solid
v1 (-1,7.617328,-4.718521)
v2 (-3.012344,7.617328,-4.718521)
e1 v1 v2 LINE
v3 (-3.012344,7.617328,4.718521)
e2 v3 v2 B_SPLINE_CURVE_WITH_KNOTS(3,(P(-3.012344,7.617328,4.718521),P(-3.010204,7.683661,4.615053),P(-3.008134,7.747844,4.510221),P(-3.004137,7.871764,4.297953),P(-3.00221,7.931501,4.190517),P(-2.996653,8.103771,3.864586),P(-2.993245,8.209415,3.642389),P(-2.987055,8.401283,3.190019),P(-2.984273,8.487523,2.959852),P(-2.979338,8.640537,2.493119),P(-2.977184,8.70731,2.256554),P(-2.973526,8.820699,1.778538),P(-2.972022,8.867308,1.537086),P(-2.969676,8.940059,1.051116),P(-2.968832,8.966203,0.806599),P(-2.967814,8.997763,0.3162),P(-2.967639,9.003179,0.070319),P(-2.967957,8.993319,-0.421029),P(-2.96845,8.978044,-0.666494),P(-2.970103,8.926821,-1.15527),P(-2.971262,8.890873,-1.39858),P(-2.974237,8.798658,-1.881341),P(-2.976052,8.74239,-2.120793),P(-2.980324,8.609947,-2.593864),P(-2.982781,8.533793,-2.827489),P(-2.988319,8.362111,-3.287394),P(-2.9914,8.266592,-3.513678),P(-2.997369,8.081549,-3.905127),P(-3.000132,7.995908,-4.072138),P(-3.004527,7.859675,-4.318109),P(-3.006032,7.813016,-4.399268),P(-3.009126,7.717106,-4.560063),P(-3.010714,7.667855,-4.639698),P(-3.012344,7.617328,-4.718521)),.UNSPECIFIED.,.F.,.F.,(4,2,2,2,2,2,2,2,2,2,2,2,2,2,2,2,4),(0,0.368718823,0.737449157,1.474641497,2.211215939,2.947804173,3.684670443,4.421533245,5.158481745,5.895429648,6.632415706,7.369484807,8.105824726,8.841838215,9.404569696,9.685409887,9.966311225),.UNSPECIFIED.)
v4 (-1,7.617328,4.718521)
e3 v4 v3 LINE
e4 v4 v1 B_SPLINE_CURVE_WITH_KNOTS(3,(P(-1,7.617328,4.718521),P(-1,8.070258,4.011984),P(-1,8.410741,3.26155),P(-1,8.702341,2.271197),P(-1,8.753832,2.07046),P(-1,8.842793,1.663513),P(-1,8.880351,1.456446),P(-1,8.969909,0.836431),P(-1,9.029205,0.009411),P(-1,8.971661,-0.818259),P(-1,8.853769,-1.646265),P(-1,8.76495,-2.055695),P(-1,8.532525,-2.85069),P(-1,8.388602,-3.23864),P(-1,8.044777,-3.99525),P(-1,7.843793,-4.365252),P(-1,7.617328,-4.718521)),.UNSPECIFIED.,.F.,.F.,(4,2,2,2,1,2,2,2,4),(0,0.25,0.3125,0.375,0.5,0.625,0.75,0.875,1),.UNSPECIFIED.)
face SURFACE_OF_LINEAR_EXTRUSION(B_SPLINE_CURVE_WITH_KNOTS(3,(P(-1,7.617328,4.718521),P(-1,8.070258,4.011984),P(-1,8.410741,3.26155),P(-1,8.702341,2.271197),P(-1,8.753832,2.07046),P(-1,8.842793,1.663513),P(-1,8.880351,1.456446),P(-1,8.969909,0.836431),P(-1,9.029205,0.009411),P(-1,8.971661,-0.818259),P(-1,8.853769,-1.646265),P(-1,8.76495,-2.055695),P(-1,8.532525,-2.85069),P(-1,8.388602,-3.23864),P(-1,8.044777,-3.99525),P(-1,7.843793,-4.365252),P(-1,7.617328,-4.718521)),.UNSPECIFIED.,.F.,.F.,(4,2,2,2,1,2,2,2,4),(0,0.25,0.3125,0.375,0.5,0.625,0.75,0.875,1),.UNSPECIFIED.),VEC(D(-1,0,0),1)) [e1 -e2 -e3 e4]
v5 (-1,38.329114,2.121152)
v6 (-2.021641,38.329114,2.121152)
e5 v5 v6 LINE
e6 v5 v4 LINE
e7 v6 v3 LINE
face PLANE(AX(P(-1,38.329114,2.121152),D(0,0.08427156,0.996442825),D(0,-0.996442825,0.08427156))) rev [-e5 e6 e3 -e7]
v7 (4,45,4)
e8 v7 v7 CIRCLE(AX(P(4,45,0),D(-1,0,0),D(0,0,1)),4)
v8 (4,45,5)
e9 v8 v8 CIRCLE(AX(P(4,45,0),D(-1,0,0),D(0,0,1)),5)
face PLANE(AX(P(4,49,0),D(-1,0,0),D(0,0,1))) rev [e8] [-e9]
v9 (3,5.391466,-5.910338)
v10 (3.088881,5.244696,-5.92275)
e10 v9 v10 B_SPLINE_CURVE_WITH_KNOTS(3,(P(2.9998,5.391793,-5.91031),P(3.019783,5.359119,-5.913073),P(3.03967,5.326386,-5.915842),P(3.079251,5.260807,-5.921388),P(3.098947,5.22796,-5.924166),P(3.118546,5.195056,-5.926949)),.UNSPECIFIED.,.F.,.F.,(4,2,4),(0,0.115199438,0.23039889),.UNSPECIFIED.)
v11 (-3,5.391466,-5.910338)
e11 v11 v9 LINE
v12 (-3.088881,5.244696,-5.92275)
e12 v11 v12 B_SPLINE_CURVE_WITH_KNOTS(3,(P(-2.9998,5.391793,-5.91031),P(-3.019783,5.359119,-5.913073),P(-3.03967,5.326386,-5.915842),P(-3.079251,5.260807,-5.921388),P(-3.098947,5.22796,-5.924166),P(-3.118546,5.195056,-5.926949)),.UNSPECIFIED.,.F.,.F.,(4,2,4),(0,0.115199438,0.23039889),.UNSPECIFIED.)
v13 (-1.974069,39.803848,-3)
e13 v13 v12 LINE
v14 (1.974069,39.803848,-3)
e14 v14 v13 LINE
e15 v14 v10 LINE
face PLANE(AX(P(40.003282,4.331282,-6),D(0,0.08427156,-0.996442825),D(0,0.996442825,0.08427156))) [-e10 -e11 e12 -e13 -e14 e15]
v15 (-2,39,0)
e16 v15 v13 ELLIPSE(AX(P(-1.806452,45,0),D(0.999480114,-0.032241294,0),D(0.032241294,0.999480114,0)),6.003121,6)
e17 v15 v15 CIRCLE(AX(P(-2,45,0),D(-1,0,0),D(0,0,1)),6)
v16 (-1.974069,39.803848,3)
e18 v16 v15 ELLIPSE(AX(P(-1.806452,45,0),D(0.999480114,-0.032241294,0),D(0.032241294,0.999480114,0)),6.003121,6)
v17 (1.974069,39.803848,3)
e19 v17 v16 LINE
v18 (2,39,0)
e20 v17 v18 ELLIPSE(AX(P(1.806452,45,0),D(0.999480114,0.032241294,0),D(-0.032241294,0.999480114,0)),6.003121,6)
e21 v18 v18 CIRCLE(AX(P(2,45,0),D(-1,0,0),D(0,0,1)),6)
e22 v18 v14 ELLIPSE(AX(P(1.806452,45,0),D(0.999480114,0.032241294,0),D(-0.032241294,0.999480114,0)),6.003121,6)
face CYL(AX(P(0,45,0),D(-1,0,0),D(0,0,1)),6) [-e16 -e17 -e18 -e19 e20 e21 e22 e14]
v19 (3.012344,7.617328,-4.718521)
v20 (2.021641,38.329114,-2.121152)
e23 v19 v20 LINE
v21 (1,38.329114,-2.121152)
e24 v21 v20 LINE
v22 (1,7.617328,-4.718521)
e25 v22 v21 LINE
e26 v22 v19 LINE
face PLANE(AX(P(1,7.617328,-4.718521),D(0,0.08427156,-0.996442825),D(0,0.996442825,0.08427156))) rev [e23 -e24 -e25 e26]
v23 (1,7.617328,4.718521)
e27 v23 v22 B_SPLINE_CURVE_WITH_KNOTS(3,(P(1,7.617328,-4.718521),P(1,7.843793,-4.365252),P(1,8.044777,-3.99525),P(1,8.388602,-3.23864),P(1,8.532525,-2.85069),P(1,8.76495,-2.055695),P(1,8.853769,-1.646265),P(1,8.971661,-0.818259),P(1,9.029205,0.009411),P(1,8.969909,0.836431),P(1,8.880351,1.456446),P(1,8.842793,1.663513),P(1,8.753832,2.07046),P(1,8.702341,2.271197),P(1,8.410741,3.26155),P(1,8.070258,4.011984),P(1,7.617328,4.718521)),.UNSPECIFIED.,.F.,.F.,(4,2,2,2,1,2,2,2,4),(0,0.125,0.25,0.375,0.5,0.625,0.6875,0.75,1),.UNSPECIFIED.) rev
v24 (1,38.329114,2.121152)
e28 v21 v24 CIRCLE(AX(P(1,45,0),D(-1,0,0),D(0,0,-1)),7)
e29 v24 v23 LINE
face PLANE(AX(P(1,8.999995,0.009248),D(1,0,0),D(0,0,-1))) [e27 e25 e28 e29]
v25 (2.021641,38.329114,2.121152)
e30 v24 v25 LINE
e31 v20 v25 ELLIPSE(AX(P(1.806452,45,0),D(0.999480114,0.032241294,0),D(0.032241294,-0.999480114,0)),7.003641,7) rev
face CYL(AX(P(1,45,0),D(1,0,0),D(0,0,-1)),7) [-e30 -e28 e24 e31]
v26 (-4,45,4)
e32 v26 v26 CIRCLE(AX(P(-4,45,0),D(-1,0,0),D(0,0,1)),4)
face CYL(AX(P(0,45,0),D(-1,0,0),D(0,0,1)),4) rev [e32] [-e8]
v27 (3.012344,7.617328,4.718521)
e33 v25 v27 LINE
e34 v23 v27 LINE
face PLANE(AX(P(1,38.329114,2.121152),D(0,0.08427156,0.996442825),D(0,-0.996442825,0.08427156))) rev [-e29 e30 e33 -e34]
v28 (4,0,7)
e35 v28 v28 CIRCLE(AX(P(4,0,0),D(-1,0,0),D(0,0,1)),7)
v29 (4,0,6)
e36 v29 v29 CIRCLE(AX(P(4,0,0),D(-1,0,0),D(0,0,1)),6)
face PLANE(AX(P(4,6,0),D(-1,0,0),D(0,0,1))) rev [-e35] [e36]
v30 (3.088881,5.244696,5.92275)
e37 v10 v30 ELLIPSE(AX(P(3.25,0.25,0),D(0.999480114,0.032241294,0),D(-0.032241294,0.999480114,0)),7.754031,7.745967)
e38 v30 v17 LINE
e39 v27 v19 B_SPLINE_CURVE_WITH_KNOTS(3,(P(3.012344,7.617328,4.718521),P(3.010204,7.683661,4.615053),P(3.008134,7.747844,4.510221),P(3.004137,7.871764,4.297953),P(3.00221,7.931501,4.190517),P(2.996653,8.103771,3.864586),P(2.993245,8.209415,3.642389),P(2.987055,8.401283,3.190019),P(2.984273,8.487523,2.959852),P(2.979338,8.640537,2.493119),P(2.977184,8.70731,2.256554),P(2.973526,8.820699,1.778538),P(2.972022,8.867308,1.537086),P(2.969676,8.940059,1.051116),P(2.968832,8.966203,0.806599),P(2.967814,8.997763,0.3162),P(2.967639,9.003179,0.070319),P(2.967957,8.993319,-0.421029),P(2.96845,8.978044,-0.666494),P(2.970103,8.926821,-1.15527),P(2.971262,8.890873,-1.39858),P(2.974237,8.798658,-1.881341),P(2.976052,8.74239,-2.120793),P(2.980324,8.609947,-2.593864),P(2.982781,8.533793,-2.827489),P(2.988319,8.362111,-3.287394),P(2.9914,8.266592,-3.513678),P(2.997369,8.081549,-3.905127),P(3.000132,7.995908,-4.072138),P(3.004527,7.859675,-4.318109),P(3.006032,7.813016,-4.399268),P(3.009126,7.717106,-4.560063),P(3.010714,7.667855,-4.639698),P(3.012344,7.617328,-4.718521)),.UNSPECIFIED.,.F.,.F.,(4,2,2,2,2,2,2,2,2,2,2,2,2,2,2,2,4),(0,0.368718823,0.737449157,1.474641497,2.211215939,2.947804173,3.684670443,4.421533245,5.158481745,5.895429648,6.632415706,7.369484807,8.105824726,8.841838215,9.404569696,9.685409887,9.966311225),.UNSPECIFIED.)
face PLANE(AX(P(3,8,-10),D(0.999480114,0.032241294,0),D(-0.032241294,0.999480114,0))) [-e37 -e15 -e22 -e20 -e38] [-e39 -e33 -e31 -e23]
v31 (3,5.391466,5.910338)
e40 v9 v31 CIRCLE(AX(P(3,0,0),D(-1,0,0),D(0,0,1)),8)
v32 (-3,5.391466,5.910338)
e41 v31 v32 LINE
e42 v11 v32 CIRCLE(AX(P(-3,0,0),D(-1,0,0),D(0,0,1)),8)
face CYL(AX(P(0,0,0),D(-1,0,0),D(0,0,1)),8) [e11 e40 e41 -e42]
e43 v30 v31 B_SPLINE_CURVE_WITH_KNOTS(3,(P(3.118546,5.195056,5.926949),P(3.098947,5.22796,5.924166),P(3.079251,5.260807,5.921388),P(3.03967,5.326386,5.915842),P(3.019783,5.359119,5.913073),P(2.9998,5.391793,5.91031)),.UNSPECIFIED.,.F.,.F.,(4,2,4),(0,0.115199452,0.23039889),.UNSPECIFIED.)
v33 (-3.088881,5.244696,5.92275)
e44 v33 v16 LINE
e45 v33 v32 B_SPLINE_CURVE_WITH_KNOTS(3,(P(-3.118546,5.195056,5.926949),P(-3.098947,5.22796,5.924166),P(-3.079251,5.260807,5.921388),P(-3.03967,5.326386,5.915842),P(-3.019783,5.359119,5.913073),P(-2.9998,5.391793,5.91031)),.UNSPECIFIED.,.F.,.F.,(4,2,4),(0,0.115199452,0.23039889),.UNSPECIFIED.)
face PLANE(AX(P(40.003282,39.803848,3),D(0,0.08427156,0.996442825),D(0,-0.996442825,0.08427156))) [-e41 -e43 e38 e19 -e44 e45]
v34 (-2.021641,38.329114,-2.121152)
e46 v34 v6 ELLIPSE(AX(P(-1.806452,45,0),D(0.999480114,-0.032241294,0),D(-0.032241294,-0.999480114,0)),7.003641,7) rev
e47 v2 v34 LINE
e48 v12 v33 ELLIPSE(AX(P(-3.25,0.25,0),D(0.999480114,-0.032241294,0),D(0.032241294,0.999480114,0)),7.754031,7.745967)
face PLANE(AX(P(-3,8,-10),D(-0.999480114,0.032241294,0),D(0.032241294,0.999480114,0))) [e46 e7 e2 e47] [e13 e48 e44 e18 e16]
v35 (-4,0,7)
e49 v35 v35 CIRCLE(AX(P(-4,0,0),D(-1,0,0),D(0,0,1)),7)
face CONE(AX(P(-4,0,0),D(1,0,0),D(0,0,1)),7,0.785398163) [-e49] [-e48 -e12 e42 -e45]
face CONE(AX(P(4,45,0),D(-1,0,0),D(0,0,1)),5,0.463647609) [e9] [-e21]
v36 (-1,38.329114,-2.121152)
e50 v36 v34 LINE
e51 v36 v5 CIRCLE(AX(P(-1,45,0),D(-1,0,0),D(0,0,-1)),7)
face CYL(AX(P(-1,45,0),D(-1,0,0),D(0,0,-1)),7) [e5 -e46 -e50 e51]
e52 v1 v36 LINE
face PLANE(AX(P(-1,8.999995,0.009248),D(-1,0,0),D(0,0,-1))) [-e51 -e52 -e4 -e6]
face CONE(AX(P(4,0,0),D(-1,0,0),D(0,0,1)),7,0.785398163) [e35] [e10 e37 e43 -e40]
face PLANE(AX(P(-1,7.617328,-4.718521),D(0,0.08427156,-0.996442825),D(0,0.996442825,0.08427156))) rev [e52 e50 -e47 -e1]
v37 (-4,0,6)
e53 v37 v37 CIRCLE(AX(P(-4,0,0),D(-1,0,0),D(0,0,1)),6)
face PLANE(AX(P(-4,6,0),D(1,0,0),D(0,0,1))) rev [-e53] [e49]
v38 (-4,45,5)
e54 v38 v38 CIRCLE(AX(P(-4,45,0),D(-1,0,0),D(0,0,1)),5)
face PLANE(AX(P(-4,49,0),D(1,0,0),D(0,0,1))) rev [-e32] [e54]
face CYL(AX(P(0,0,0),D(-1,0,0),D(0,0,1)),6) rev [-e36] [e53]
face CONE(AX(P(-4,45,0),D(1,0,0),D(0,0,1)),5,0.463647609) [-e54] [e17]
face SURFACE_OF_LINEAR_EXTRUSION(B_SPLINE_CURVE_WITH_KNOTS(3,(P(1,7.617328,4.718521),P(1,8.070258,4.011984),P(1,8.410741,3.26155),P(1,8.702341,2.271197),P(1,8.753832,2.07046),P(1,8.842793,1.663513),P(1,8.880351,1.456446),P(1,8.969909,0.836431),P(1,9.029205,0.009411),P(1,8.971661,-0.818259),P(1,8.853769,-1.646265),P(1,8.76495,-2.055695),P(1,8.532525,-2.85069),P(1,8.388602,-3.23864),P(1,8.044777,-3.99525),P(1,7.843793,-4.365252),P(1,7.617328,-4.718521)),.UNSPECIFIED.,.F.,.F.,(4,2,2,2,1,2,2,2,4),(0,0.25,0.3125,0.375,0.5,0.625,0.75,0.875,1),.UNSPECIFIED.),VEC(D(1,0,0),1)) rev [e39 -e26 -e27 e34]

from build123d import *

# Parameters (mm, degrees)
BOSS_EXTRU_1_START      = -2.0000001
BOSS_EXTRU_1_DEPTH      = 2.0000001
BOSS_EXTRU_1_START_2    = 2.0000001
BOSS_EXTRU_1_2_DEPTH    = 1.088880676
BOSS_EXTRU_1_START_3    = 3.256370695
BOSS_EXTRU_1_3_DEPTH    = 1.743629305
BOSS_EXTRU_1_START_4    = 3.172268194
BOSS_EXTRU_1_4_DEPTH    = 0.084102501
ENL_V_MAT_EXTRU_1_DEPTH = 9


with BuildPart() as part:
    # Esquisse2 → Révolution1 (revolve)
    with BuildSketch(Plane.XY, mode=Mode.PRIVATE) as r_volution1_sk:
        Polygon((2.4e-16, 6), (4, 6), (4, 7), (2.9999999999999996, 8), (-1.8e-16, 8), align=None)
    revolve(r_volution1_sk.sketch.rotate(Axis((0, 0, 0), (1, 0, 0)), 90), axis=Axis((0, 0, 0), (1, 0, 0)))



with BuildPart() as body_2:
    # Esquisse3 → Révolution2 (revolve)
    with BuildSketch(Plane.XY, mode=Mode.PRIVATE) as r_volution2_sk:
        Polygon((0, 48.99999999999999), (4.01e-15, 51), (2, 51), (4, 49.99999999999999), (4, 48.99999999999999), align=None)
    revolve(r_volution2_sk.sketch.rotate(Axis((0, 45, 0), (1, 0, 0)), 90), axis=Axis((0, 45, 0), (1, 0, 0)))


with BuildPart() as part_1:
    add(part.part)

    add(body_2.part)  # Boss.-Extru.1 merges body 2
    # Boss.-Extru.1: read off the stored shape, not the designer's step
    # Boss.-Extru.1 outline → Boss.-Extru.1 (add)
    with BuildSketch(Plane.ZY.offset(BOSS_EXTRU_1_START)):
        with BuildLine():
            ThreePointArc((-5.910337632, 5.39146632), (0, 8), (5.910337632, 5.39146632))
            Line((5.910337632, 5.39146632), (3, 39.803847577))
            ThreePointArc((3, 39.803847577), (0, 39), (-3, 39.803847577))
            Line((-3, 39.803847577), (-5.910337632, 5.39146632))
        make_face()
    extrude(amount=BOSS_EXTRU_1_DEPTH)

    # Boss.-Extru.1 2 outline → Boss.-Extru.1 2 (add)
    with BuildSketch(Plane.YZ.offset(BOSS_EXTRU_1_START_2)):
        with BuildLine():
            ThreePointArc((39.803847577, -3), (39, 0), (39.803847577, 3))
            Line((39.803847577, 3), (5.39146632, 5.910337632))
            ThreePointArc((5.39146632, 5.910337632), (8, 0), (5.39146632, -5.910337632))
            Line((5.39146632, -5.910337632), (39.803847577, -3))
        make_face()
    extrude(amount=BOSS_EXTRU_1_2_DEPTH)

    # Boss.-Extru.1 3 outline → Boss.-Extru.1 3 (cut)
    with BuildSketch(Plane(origin=(0, 0, 0), x_dir=(-0.032241294010957995, 0.9994801143396995, 0), z_dir=(0.9994801143396996, 0.032241294010957995, 0)).offset(BOSS_EXTRU_1_START_3)):
        with BuildLine():
            add(Edge.make_bspline(
                [(5.142379796, -5.922750354), (12.17659734275441, -2.94e-15), (5.142379796, 5.922750354)],
                knots=[5.412727934893089, 5.412727934893089, 5.412727934893089, 7.153642679466084, 7.153642679466084, 7.153642679466084], degree=2, weights=[1, 0.6444768969331849, 1]))
            Line((5.142379796, -5.922750354), (39.719507575, -3))
            add(Edge.make_bspline(
                [(39.719507575, -3), (39.4087631690425, -2.4620547166991407), (39.162117173894764, -1.8742292038542891), (38.995705810616975, -1.2534964190781404), (38.91524187122639, -0.6211657082460426), (38.91524187122635, 0.6211657082460548), (38.99570581061705, 1.2534964190781592), (39.16211717389469, 1.8742292038543251), (39.40876316904256, 2.46205471669918), (39.719507575, 3)],
                knots=[3.141592653589793, 3.141592653589793, 3.141592653589793, 3.141592653589793, 3.141592653589793, 3.141592653589793, 3.665191429188086, 3.665191429188086, 3.665191429188086, 3.665191429188086, 4.188790204786387, 4.188790204786387, 4.188790204786387, 4.188790204786387, 4.188790204786387, 4.188790204786387], degree=5, weights=[1, 0.9999999999999991, 0.9995355802743678, 0.9995355802743658, 1.0000000000000004, 0.9999999999999986, 0.9995355802743691, 0.9995355802743657, 1.0000000000000004, 1]))
            Line((39.719507575, 3), (5.142379796, 5.922750354))
        make_face()
    extrude(amount=BOSS_EXTRU_1_3_DEPTH, mode=Mode.SUBTRACT)

    # Boss.-Extru.1 4 outline → Boss.-Extru.1 4 (add)
    with BuildSketch(Plane(origin=(0, 0, 0), x_dir=(-0.032241294010957995, 0.9994801143396995, 0), z_dir=(0.9994801143396996, 0.032241294010957995, 0)).offset(BOSS_EXTRU_1_START_4)):
        with BuildLine():
            add(Edge.make_bspline(
                [(5.142379796, -5.922750354), (12.17659734275441, -2.94e-15), (5.142379796, 5.922750354)],
                knots=[5.412727934893089, 5.412727934893089, 5.412727934893089, 7.153642679466084, 7.153642679466084, 7.153642679466084], degree=2, weights=[1, 0.6444768969331849, 1]))
            Line((5.142379796, -5.922750354), (39.719507575, -3))
            add(Edge.make_bspline(
                [(39.719507575, -3), (39.4087631690425, -2.4620547166991407), (39.162117173894764, -1.8742292038542891), (38.995705810616975, -1.2534964190781404), (38.91524187122639, -0.6211657082460426), (38.91524187122635, 0.6211657082460548), (38.99570581061705, 1.2534964190781592), (39.16211717389469, 1.8742292038543251), (39.40876316904256, 2.46205471669918), (39.719507575, 3)],
                knots=[3.141592653589793, 3.141592653589793, 3.141592653589793, 3.141592653589793, 3.141592653589793, 3.141592653589793, 3.665191429188086, 3.665191429188086, 3.665191429188086, 3.665191429188086, 4.188790204786387, 4.188790204786387, 4.188790204786387, 4.188790204786387, 4.188790204786387, 4.188790204786387], degree=5, weights=[1, 0.9999999999999991, 0.9995355802743678, 0.9995355802743658, 1.0000000000000004, 0.9999999999999986, 0.9995355802743691, 0.9995355802743657, 1.0000000000000004, 1]))
            Line((39.719507575, 3), (5.142379796, 5.922750354))
        make_face()
    extrude(amount=BOSS_EXTRU_1_4_DEPTH)

    # Esquisse6 → Enlèv. mat.-Extru.1 (cut)
    with BuildSketch(Plane(origin=(10, 0, 0), x_dir=(0, 0, -1), z_dir=(1, 0, 0))):
        with BuildLine():
            Line((4.7185213239125305, 7.617327682628814), (2.121151849996758, 38.329114389434075))
            ThreePointArc((2.121151849996758, 38.329114389434075), (1.0732662125583343, 38.082767920838506), (1.29e-15, 37.999999999999986))
            ThreePointArc((1.29e-15, 37.999999999999986), (-1.0732662125583345, 38.08276792083852), (-2.12115184999676, 38.32911438943409))
            Line((-2.12115184999676, 38.32911438943409), (-4.7185213239117045, 7.617327682628745))
            add(Edge.make_bspline(
                [(-4.7185213239117045, 7.617327682628745), (-4.011984255343939, 8.070257956932029), (-3.261550361542695, 8.410740591888102), (-2.2711967086518885, 8.702341470829111), (-2.0704598676815316, 8.75383204519997), (-1.6635130029960632, 8.842792898029453), (-1.456446032141917, 8.880350619711338), (-0.8364313606849374, 8.969908948596256), (-0.00941084225722518, 9.029205401703816), (0.818259414860091, 8.971660679545408), (1.646265253396883, 8.853769039344968), (2.0556953800959668, 8.76494999754429), (2.850690444417165, 8.532525136333405), (3.23863975479659, 8.388601680371798), (3.9952504696443585, 8.044777052176354), (4.365252036804486, 7.8437933023834185), (4.7185213239125305, 7.617327682628814)],
                knots=[0, 0, 0, 0, 0.24999999999999978, 0.24999999999999978, 0.31249999999999983, 0.31249999999999983, 0.3749999999999999, 0.3749999999999999, 0.4999999999999999, 0.6249999999999999, 0.6249999999999999, 0.7499999999999999, 0.7499999999999999, 0.8749999999999999, 0.8749999999999999, 1, 1, 1, 1], degree=3))
        make_face()
    extrude(amount=-ENL_V_MAT_EXTRU_1_DEPTH, mode=Mode.SUBTRACT)

    # Symétrie10: part across plane


with BuildPart() as part_2:
    add(part_1.part)
    add(part_1.part.mirror(Plane(origin=(0, 0, 0), x_dir=(0, 0, 1), z_dir=(1, 0, 0))))


solid = part_2.part
